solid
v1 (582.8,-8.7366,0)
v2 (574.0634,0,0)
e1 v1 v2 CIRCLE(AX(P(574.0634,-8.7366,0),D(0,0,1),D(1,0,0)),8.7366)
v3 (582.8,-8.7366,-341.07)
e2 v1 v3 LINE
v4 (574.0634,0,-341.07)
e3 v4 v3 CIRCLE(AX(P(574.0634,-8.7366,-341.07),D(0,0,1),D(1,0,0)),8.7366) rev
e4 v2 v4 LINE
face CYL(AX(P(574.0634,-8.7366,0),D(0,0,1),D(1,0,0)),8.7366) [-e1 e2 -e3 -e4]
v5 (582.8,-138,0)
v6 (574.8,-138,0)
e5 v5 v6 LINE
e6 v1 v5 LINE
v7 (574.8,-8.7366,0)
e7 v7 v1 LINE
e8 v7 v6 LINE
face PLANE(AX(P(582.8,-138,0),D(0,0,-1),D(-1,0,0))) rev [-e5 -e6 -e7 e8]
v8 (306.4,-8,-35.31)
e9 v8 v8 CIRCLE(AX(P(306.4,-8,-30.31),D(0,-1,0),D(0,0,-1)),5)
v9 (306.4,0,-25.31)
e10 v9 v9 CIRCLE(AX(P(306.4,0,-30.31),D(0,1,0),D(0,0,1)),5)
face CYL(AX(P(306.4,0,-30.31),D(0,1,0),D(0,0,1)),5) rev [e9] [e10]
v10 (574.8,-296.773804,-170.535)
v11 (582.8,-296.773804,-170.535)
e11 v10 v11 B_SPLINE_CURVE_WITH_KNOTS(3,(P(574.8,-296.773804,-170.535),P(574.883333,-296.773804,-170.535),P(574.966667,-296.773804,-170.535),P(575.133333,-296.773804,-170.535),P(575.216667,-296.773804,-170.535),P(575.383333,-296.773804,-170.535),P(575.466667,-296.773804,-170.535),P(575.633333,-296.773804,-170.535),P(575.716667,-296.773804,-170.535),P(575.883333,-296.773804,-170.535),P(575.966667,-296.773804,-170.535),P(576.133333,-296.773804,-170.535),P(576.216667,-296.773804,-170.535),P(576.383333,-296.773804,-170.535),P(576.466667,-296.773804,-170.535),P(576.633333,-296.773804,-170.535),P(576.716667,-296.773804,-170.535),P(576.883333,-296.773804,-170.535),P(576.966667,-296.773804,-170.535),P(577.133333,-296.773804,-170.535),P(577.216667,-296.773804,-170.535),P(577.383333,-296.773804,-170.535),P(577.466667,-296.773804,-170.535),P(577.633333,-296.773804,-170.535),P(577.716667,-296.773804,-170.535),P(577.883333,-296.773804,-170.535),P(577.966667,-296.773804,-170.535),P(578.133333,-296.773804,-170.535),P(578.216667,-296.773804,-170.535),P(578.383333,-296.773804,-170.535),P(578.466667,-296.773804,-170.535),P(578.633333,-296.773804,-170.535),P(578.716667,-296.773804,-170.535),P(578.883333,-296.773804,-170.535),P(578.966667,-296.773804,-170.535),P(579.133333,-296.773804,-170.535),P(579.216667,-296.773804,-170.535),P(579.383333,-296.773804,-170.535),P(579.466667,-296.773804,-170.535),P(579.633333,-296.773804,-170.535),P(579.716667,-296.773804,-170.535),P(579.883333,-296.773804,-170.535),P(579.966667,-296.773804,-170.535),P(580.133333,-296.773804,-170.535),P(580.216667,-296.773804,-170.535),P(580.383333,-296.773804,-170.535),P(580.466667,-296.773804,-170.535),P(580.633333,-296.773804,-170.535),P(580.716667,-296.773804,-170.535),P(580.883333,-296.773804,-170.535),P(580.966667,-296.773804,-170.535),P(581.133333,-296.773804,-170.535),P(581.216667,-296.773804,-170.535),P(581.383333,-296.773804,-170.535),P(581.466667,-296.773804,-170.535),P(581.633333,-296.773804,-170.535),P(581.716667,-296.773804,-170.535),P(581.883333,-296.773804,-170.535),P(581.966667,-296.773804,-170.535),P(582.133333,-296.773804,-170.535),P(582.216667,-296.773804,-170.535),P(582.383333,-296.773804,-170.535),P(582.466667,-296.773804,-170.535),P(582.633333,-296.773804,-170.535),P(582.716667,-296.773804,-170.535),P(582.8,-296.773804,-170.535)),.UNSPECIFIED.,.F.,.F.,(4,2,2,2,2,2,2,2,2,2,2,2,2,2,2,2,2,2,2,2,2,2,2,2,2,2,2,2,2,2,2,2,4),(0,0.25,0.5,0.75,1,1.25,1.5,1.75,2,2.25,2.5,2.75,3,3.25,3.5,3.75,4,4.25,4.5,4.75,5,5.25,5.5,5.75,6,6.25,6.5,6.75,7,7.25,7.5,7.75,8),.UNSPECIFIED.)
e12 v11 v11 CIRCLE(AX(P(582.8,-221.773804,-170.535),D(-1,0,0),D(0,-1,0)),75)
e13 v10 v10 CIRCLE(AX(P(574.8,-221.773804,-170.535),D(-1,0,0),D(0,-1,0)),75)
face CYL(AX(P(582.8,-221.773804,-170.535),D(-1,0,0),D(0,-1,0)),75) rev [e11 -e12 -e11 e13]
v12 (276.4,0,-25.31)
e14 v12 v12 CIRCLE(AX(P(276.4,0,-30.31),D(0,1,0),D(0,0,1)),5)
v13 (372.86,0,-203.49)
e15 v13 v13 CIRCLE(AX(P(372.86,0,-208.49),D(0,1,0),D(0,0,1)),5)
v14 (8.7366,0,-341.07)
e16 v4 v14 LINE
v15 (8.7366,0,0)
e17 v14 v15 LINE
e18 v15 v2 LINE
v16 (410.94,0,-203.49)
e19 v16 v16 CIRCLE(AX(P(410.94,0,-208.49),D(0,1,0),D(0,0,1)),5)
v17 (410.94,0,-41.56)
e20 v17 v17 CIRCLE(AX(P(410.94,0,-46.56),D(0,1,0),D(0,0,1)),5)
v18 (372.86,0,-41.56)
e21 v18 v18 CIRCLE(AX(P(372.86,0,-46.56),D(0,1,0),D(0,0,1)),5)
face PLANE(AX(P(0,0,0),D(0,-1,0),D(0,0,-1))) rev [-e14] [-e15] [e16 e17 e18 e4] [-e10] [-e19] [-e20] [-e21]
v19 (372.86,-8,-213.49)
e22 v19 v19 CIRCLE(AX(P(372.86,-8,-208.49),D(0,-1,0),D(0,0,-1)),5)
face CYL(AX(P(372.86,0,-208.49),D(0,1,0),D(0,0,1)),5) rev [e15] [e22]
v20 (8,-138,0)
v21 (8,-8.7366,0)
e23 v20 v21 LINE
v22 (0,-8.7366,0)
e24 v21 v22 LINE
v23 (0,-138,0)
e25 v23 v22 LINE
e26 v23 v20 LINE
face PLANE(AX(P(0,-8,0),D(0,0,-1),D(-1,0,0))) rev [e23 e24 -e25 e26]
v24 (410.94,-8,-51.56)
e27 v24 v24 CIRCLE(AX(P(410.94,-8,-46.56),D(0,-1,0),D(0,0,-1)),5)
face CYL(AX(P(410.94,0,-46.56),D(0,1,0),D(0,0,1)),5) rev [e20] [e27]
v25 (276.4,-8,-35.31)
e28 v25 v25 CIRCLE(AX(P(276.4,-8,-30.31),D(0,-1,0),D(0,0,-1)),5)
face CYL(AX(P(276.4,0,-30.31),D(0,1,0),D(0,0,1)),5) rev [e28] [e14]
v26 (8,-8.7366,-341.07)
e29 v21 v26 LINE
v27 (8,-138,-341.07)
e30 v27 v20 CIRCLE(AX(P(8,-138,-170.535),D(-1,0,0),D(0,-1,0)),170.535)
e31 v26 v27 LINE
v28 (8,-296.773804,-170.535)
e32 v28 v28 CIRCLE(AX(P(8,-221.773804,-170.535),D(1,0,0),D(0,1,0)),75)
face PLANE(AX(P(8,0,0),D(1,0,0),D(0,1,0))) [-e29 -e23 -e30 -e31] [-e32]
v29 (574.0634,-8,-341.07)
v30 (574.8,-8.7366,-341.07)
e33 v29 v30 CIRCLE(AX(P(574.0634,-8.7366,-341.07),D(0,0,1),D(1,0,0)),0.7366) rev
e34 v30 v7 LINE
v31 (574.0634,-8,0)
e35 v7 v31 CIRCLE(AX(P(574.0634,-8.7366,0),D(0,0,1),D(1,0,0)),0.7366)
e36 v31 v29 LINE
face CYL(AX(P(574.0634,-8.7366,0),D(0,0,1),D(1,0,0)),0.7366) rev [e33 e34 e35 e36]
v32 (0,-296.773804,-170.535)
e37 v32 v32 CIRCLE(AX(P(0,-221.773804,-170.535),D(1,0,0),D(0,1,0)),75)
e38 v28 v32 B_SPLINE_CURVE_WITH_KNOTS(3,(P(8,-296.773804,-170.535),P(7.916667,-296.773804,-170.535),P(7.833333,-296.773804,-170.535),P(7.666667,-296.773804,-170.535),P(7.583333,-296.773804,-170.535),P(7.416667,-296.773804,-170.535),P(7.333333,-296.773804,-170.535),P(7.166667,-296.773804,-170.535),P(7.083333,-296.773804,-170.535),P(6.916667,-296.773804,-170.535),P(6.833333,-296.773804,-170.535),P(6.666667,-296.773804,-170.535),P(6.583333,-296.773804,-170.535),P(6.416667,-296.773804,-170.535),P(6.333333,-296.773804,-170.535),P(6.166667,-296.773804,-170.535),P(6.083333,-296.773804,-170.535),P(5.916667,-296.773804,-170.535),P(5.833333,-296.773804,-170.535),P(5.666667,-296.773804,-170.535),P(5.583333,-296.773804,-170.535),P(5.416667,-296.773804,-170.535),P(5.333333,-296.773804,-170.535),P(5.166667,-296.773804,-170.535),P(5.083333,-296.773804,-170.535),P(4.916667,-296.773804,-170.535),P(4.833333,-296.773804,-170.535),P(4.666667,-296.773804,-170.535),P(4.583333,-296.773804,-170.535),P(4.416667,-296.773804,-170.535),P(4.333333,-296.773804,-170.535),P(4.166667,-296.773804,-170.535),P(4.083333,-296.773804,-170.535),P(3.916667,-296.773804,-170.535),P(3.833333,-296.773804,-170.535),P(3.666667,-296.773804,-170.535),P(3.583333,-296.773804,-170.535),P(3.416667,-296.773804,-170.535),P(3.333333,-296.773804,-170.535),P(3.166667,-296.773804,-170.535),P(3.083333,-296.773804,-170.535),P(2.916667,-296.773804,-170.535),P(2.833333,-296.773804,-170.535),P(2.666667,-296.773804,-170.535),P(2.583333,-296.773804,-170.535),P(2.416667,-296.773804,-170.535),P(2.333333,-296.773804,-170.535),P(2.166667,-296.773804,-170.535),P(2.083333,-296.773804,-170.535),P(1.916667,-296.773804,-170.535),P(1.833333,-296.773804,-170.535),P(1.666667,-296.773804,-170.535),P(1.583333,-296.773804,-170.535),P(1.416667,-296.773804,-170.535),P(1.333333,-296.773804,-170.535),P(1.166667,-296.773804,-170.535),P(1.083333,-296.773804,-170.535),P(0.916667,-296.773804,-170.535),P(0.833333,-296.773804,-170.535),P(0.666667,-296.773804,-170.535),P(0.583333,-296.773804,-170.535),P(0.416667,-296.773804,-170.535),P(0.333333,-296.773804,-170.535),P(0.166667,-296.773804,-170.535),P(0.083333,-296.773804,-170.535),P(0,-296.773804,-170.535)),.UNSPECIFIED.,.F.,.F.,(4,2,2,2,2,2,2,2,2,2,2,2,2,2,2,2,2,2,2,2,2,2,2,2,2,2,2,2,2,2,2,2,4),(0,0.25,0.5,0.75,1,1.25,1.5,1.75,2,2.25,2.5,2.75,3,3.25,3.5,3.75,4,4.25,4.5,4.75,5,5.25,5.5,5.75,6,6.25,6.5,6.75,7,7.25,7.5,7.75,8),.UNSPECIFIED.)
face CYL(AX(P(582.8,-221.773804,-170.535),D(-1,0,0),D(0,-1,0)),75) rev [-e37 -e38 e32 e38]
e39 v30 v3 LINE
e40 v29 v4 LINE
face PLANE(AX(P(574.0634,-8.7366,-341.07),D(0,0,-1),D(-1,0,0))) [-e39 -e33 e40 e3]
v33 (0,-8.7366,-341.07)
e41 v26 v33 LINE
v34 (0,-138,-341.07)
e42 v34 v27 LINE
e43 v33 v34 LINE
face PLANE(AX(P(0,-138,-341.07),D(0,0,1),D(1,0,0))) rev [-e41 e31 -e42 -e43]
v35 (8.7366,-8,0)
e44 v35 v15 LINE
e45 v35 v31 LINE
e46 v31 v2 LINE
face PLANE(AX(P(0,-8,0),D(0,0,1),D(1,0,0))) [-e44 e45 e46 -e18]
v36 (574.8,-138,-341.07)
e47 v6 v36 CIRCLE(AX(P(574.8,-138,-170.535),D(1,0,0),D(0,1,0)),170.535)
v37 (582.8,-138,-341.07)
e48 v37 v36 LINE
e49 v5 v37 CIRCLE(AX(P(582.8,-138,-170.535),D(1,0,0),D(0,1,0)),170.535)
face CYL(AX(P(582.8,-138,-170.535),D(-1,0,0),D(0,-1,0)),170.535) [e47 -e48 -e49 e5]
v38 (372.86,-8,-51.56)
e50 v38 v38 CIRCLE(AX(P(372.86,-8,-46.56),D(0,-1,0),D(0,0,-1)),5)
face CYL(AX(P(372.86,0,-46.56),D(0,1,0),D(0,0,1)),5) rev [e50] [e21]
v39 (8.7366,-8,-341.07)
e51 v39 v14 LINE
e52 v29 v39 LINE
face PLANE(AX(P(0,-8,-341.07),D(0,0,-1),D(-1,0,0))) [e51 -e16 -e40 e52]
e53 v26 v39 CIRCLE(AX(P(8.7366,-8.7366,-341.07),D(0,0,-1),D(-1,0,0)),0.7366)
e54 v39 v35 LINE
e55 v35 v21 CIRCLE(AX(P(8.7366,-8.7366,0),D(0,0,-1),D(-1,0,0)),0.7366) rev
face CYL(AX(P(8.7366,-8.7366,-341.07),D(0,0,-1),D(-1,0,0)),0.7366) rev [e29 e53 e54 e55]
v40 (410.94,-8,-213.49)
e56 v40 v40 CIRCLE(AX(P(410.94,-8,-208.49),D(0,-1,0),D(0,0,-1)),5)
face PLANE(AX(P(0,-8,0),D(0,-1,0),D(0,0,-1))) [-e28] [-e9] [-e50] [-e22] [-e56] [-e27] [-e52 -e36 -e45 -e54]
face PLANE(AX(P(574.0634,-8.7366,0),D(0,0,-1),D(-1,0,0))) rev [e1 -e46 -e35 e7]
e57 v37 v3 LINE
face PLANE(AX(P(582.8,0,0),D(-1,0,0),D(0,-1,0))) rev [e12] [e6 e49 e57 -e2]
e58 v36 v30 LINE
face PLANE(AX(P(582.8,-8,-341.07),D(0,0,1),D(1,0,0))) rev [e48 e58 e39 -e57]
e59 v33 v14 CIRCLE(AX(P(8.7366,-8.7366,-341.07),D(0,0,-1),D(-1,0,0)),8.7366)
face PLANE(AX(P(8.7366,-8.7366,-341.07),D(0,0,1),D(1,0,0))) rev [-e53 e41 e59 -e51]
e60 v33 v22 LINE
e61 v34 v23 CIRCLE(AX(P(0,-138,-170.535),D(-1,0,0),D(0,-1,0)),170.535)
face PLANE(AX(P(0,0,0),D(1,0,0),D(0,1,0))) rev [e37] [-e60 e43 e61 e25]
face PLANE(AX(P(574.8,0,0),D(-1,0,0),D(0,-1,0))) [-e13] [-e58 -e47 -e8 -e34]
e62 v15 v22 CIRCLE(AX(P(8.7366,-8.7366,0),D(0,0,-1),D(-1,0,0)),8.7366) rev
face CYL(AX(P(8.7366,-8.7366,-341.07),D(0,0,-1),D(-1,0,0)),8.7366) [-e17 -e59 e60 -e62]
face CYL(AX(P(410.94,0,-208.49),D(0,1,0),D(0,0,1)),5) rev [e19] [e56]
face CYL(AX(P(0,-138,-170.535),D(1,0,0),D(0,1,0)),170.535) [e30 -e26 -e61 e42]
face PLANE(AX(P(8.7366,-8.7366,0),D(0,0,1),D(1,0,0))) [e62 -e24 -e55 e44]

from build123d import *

# Parameters (mm, degrees)
SKETCH2_W                      = 582.8
SKETCH2_H                      = 341.07
BASE_FLANGE5_DEPTH             = 8
EDGE_FLANGE2_STRIP_W           = 33.4732
EDGE_FLANGE2_STRIP_H           = 8
EDGE_FLANGE2_STRIP_CUT_DEPTH   = 341.07
EDGE_FLANGE2_STRIP_2_W         = 33.4732
EDGE_FLANGE2_STRIP_2_H         = 8
EDGE_FLANGE2_STRIP_CUT_2_DEPTH = 341.07
EDGE_FLANGE2_DEPTH             = 341.07
EDGE_FLANGE2_BEND_DEPTH        = 341.07
BOSS_EXTRUDE4_DEPTH            = 4
F_10_0MM_DOWEL_HOLE1_D         = 10
BOSS_EXTRUDE5_DEPTH            = 4
CUT_EXTRUDE2_DEPTH             = 743.413921694
CUT_EXTRUDE2_DEPTH_BACK        = 743.413921694
SKETCH40_R                     = 75
F_10_0MM_DOWEL_HOLE2_D         = 10
F_10_0MM_DOWEL_HOLE3_D         = 10


# Sheet-metal steps are written as plain solids
with BuildPart() as part:
    # Sketch2 → Base-Flange5 (new body)
    with BuildSketch(Plane(origin=(0, 0, 0), x_dir=(1, 0, 0), z_dir=(0, 1, 0))):
        with Locations((291.4, 170.535)):
            Rectangle(SKETCH2_W, SKETCH2_H)
    extrude(amount=-BASE_FLANGE5_DEPTH)

    # Edge-Flange2 strip (across the edge) → Edge-Flange2 strip cut (cut)
    with BuildSketch(Plane(origin=(0, -8, 0), x_dir=(1, 0, 0), z_dir=(0, 0, -1))):
        with Locations((-8, -4)):
            Rectangle(EDGE_FLANGE2_STRIP_W, EDGE_FLANGE2_STRIP_H)
    extrude(amount=EDGE_FLANGE2_STRIP_CUT_DEPTH, mode=Mode.SUBTRACT)

    # Edge-Flange2 strip 2 (across the edge) → Edge-Flange2 strip cut 2 (cut)
    with BuildSketch(Plane(origin=(582.8, -8, -341.07), x_dir=(-1, 0, 0), z_dir=(0, 0, 1))):
        with Locations((-8, -4)):
            Rectangle(EDGE_FLANGE2_STRIP_2_W, EDGE_FLANGE2_STRIP_2_H)
    extrude(amount=EDGE_FLANGE2_STRIP_CUT_2_DEPTH, mode=Mode.SUBTRACT)

    # Edge-Flange2 section (across the edge) → Edge-Flange2 (add)
    with BuildSketch(Plane(origin=(0, -8, 0), x_dir=(1, 0, 0), z_dir=(0, 0, -1))):
        with BuildLine():
            Line((0, 0.7366), (0, 130))
            Line((0, 130), (8, 130))
            Line((8, 130), (8, 0.7366))
            ThreePointArc((8, 0.7366), (8.215745145, 0.215745145), (8.7366, 0))
            Line((8.7366, 0), (8.7366, -8))
            ThreePointArc((8.7366, -8), (2.558890895, -5.441109105), (0, 0.7366))
        make_face()
    extrude(amount=EDGE_FLANGE2_DEPTH)

    # Edge-Flange2 section 2 (across the edge) → Edge-Flange2 bend (add)
    with BuildSketch(Plane(origin=(582.8, -8, -341.07), x_dir=(-1, 0, 0), z_dir=(0, 0, 1))):
        with BuildLine():
            Line((0, 0.7366), (0, 130))
            Line((0, 130), (8, 130))
            Line((8, 130), (8, 0.7366))
            ThreePointArc((8, 0.7366), (8.215745145, 0.215745145), (8.7366, 0))
            Line((8.7366, 0), (8.7366, -8))
            ThreePointArc((8.7366, -8), (2.558890895, -5.441109105), (0, 0.7366))
        make_face()
    extrude(amount=EDGE_FLANGE2_BEND_DEPTH)

    # Sketch39 → Boss-Extrude4 (add, symmetric)
    with BuildSketch(Plane.ZY.offset(-4)):
        with BuildLine():
            Line((-341.07, -138), (0, -138))
            ThreePointArc((0, -138), (-170.535, -308.535), (-341.07, -138))
        make_face()
    extrude(amount=BOSS_EXTRUDE4_DEPTH, both=True)

    # Ø10.0mm Dowel Hole1 (through all)
    with Locations(Plane(origin=(306.4, 0, -30.31), x_dir=(0, 0, 1), z_dir=(0, 1, 0))):
        with Locations((0, 0), (0, -30)):
            Hole(F_10_0MM_DOWEL_HOLE1_D / 2)

    # Sketch46 → Boss-Extrude5 (add, symmetric)
    with BuildSketch(Plane(origin=(578.8, 0, 0), x_dir=(0, 0, -1), z_dir=(1, 0, 0))):
        with BuildLine():
            Line((0, -138), (341.07, -138))
            ThreePointArc((341.07, -138), (170.535, -308.535), (0, -138))
        make_face()
    extrude(amount=BOSS_EXTRUDE5_DEPTH, both=True)

    # Sketch40 → Cut-Extrude2 (cut, two sides: drawn at the far end of the back side and taken through both)
    with BuildSketch(Plane.ZY.offset(-CUT_EXTRUDE2_DEPTH_BACK)):
        with Locations(Location((-170.535, -221.773804428, 0), (0, 0, 270))):
            Circle(SKETCH40_R)
    extrude(amount=CUT_EXTRUDE2_DEPTH + CUT_EXTRUDE2_DEPTH_BACK, mode=Mode.SUBTRACT)

    # Ø10.0mm Dowel Hole2 (through all)
    with Locations(Plane(origin=(372.86, 0, -46.56), x_dir=(0, 0, 1), z_dir=(0, 1, 0))):
        with Locations((0, 0), (0, 38.08)):
            Hole(F_10_0MM_DOWEL_HOLE2_D / 2)

    # Ø10.0mm Dowel Hole3 (through all)
    with Locations(Plane(origin=(410.94, 0, -208.49), x_dir=(0, 0, 1), z_dir=(0, 1, 0))):
        with Locations((0, 0), (0, -38.08)):
            Hole(F_10_0MM_DOWEL_HOLE3_D / 2)


solid = part.part
